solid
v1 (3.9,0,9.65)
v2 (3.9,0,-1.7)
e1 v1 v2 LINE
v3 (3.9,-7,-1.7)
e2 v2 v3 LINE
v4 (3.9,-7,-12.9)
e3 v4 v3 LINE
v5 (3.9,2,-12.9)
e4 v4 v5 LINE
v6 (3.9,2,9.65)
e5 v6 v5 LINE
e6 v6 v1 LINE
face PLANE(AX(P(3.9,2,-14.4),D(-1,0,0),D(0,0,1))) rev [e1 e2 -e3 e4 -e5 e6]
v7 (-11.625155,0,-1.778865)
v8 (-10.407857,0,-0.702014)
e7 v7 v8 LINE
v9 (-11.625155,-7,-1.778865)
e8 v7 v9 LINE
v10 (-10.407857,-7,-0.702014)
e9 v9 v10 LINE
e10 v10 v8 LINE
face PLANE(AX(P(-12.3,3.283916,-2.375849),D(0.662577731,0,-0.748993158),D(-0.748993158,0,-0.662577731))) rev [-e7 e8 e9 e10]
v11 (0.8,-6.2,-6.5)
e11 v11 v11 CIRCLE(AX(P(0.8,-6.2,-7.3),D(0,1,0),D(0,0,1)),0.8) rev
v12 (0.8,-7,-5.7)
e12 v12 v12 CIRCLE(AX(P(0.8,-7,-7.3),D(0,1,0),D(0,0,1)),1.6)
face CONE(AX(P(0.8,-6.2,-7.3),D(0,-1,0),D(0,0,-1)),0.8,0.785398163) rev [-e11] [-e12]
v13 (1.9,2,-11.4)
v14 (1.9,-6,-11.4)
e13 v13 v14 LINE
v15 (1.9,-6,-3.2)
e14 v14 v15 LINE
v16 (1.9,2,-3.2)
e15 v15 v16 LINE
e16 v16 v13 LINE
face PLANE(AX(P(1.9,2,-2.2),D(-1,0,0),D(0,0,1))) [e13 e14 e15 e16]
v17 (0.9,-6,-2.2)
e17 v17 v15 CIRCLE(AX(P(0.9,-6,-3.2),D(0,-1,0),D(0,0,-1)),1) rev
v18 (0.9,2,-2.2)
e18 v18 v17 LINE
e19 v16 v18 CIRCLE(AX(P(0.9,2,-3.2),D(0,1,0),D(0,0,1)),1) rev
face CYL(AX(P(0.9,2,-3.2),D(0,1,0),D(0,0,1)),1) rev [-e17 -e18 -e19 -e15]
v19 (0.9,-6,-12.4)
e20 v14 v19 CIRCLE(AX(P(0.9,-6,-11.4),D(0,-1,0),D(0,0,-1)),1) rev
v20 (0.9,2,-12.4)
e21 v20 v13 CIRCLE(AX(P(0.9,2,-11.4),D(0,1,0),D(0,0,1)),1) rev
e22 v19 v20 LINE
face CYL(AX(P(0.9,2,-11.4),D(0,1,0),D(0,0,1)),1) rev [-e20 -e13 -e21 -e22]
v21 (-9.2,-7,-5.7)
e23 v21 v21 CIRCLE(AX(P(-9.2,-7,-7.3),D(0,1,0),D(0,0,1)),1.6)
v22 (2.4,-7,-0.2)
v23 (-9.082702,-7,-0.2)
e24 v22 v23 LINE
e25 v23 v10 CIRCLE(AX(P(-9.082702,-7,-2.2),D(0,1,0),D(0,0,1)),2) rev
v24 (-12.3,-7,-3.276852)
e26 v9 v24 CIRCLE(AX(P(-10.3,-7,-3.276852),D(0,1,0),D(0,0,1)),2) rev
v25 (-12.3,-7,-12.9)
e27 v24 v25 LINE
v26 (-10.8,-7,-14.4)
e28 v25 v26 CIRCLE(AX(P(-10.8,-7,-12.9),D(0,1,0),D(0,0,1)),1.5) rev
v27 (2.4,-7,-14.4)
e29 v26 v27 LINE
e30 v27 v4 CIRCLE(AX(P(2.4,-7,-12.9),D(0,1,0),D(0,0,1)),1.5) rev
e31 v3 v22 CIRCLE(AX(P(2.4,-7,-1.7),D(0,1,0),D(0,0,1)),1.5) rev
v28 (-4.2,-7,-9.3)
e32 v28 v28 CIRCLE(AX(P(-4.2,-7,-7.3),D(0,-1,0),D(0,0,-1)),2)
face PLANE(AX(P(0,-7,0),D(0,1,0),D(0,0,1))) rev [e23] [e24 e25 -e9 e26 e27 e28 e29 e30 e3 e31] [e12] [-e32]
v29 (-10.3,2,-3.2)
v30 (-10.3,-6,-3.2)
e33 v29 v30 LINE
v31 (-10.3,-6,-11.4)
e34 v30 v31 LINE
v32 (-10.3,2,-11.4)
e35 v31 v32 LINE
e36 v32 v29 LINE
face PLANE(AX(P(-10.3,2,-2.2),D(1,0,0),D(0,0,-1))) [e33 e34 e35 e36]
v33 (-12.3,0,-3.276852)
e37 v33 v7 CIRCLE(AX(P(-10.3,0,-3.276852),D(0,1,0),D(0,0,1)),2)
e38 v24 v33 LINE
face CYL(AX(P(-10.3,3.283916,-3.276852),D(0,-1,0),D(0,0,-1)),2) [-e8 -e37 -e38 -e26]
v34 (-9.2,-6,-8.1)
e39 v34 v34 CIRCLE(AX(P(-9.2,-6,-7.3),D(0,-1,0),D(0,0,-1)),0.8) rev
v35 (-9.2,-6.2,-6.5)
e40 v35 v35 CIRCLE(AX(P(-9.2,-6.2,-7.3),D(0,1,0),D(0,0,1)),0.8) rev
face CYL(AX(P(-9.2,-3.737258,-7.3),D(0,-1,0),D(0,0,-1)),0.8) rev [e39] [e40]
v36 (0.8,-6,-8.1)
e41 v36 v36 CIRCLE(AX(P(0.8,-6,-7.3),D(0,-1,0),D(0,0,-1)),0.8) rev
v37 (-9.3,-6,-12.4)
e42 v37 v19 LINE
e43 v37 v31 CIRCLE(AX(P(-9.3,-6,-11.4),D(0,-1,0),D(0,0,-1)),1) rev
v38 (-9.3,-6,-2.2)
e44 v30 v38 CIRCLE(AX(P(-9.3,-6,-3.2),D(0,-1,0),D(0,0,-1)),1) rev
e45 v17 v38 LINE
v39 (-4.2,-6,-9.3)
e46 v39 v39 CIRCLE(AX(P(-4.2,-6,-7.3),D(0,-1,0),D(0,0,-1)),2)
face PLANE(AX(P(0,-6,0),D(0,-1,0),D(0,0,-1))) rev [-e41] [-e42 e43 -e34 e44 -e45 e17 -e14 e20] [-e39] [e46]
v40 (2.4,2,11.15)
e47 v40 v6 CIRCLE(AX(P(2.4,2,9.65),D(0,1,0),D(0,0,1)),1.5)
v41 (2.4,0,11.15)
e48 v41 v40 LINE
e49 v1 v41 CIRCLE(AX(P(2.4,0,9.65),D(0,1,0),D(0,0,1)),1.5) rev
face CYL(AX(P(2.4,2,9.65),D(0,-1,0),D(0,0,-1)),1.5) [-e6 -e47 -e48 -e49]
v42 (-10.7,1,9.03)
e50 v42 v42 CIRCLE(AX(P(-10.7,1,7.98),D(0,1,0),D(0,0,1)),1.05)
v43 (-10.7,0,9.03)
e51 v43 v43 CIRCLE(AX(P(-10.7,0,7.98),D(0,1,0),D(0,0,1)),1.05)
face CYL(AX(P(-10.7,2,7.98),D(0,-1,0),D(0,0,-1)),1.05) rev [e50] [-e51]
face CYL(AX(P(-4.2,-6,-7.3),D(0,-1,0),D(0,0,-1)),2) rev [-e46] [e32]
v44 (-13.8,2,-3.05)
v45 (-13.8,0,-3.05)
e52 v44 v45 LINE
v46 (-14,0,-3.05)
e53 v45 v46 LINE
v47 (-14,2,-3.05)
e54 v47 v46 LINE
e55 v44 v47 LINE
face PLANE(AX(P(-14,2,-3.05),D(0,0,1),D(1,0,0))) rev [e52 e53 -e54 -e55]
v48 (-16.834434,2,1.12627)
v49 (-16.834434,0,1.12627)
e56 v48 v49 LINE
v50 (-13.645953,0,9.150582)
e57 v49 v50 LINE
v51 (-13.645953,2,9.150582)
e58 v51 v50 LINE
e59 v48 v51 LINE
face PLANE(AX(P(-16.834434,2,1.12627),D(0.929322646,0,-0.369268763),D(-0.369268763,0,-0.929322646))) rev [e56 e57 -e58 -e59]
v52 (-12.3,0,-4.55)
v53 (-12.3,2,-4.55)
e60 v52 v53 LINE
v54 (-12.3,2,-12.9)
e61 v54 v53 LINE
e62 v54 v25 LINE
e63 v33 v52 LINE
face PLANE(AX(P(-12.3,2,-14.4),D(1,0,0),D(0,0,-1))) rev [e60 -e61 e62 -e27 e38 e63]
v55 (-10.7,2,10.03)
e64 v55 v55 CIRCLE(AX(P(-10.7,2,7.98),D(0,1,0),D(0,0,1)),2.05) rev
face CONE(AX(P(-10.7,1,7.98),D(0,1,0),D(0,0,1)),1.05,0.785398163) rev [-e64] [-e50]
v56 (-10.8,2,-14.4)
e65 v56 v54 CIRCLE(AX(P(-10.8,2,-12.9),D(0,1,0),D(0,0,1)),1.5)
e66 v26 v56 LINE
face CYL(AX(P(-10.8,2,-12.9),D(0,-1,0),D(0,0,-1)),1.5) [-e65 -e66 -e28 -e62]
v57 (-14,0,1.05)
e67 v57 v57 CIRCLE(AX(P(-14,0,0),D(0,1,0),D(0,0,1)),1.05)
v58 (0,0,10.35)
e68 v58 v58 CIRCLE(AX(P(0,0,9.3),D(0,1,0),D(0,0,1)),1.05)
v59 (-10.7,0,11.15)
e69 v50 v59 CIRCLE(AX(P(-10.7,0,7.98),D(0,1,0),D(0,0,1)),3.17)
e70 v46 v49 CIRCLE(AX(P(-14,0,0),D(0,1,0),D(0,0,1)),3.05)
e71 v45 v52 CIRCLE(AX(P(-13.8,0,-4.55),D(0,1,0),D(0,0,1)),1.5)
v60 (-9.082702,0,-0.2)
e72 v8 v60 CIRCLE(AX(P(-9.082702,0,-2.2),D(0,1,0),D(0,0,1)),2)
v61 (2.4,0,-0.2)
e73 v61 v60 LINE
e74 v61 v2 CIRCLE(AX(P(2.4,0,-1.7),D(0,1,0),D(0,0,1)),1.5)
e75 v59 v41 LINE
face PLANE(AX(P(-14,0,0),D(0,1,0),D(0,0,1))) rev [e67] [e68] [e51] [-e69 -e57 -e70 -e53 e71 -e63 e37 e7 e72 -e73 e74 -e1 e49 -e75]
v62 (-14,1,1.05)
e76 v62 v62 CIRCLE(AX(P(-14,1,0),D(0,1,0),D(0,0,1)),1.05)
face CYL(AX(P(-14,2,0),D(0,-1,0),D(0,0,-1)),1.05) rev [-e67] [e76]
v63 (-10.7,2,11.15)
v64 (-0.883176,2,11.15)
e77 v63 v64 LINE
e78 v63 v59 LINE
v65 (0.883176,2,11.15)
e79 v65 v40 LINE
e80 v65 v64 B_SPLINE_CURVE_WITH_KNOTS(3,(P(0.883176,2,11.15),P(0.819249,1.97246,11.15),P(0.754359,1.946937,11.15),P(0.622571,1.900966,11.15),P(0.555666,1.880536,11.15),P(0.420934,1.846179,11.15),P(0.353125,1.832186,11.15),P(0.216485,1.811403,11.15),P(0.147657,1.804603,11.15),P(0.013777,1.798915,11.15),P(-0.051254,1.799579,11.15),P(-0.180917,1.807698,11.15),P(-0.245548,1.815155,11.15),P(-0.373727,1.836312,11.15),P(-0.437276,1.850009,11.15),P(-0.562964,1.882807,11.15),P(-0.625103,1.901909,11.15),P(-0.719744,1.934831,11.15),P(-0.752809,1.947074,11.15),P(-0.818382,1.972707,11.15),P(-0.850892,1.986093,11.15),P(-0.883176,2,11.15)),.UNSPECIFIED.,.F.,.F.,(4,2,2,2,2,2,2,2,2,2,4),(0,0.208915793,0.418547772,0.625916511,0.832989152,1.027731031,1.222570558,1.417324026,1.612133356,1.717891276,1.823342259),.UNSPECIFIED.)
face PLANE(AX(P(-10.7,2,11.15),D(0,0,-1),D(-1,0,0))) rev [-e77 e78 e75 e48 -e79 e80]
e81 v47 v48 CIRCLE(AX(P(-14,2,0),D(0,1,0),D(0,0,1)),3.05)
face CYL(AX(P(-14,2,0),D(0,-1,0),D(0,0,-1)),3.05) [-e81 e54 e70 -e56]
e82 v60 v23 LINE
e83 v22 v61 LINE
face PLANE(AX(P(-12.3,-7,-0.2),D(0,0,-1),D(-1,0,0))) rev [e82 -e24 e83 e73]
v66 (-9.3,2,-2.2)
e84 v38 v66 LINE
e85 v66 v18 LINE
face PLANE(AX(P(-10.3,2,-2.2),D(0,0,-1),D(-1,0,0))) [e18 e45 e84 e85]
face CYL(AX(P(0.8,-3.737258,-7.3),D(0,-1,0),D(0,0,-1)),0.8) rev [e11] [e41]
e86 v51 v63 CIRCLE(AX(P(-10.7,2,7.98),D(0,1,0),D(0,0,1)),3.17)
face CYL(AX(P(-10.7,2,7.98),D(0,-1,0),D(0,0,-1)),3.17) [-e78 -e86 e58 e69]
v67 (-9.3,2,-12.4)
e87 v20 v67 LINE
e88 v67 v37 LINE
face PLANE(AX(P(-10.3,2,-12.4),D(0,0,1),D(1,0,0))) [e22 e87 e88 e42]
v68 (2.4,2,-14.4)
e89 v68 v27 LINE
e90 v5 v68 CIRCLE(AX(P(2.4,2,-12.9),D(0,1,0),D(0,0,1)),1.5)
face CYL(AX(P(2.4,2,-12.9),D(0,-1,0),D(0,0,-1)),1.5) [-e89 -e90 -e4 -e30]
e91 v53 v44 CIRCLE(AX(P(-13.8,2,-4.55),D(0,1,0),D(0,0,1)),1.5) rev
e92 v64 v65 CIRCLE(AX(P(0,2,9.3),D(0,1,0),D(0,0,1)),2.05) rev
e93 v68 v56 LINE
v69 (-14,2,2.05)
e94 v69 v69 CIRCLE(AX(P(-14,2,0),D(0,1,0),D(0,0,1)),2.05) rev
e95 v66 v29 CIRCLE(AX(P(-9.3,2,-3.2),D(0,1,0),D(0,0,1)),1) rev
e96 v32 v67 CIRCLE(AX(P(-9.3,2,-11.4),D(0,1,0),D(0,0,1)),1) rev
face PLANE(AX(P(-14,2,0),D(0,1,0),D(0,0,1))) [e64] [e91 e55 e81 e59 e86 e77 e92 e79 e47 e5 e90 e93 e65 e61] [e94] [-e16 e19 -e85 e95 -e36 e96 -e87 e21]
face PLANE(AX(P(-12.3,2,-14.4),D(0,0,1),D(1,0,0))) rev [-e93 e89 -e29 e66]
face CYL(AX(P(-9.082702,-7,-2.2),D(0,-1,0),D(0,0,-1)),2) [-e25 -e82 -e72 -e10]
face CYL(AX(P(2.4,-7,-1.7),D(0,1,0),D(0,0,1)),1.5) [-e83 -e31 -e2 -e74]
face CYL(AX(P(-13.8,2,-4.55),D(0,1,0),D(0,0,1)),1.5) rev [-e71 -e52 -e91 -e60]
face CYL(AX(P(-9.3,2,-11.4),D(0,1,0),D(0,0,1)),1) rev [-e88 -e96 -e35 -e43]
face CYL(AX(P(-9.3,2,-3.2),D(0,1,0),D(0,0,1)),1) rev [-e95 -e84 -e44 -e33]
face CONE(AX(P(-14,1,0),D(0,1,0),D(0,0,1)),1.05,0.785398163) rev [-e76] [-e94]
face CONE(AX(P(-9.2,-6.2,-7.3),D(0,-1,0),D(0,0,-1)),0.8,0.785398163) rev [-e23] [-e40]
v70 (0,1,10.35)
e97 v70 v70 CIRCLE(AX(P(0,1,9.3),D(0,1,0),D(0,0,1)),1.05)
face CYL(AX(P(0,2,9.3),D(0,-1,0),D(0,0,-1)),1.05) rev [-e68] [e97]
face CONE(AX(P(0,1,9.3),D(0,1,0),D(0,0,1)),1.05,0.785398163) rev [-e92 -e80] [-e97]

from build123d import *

# Parameters (mm, degrees)
SKETCH1_R           = 1.05
SKETCH1_W           = 12.2
SKETCH1_H           = 10.2
BOSS_EXTRUDE1_DEPTH = 2
SKETCH2_W           = 16.2
SKETCH2_H           = 14.2
SKETCH2_W_2         = 12.2
SKETCH2_H_2         = 10.2
BOSS_EXTRUDE2_DEPTH = 7
SKETCH4_W           = 16.2
SKETCH4_H           = 14.2
SKETCH4_R           = 2
BOSS_EXTRUDE3_DEPTH = 1
FILLET1_R           = 1.5
CUT_EXTRUDE1_DEPTH  = 7
FILLET2_R           = 2
FILLET3_R           = 1
CHAMFER2_SIZE       = 1
SKETCH6_R           = 0.8
CUT_EXTRUDE2_DEPTH  = 1
CHAMFER3_SIZE       = 0.8


with BuildPart() as part:
    # Sketch1 → Boss-Extrude1 (new body)
    with BuildSketch(Plane(origin=(0, 0, 0), x_dir=(1, 0, 0), z_dir=(0, 1, 0))):
        with BuildLine():
            Line((-16.83443407, -1.126269728), (-13.645952788, -9.15058198))
            ThreePointArc((-13.645952788, -9.15058198), (-12.480190316, -10.602941562), (-10.7, -11.15))
            Line((-10.7, -11.15), (3.9, -11.15))
            Line((3.9, -11.15), (3.9, 0.2))
            Line((3.9, 0.2), (3.9, 14.4))
            Line((3.9, 14.4), (-12.3, 14.4))
            Line((-12.3, 14.4), (-12.3, 3.05))
            Line((-12.3, 3.05), (-14, 3.05))
            ThreePointArc((-14, 3.05), (-16.523650399, 1.712801408), (-16.83443407, -1.126269728))
        make_face()
        with Locations(Location((-14, 0, 0), (0, 0, 270))):
            Circle(SKETCH1_R, mode=Mode.SUBTRACT)
        with Locations(Location((0, -9.3, 0), (0, 0, 270))):
            Circle(SKETCH1_R, mode=Mode.SUBTRACT)
        with Locations(Location((-10.7, -7.98, 0), (0, 0, 270))):
            Circle(SKETCH1_R, mode=Mode.SUBTRACT)
        with Locations((-4.2, 7.3)):
            Rectangle(SKETCH1_W, SKETCH1_H, mode=Mode.SUBTRACT)
    extrude(amount=BOSS_EXTRUDE1_DEPTH)

    # Sketch2 → Boss-Extrude2 (add)
    with BuildSketch(Plane.XZ):
        with Locations((-4.2, -7.3)):
            Rectangle(SKETCH2_W, SKETCH2_H)
        with Locations((-4.2, -7.3)):
            Rectangle(SKETCH2_W_2, SKETCH2_H_2, mode=Mode.SUBTRACT)
    extrude(amount=BOSS_EXTRUDE2_DEPTH)

    # Sketch4 → Boss-Extrude3 (add)
    with BuildSketch(Plane.XZ.offset(7)):
        with Locations((-4.2, -7.3)):
            Rectangle(SKETCH4_W, SKETCH4_H)
        with Locations(Location((-4.2, -7.3, 0), (0, 0, 270))):
            Circle(SKETCH4_R, mode=Mode.SUBTRACT)
    extrude(amount=-BOSS_EXTRUDE3_DEPTH)

    # Fillet1
    fillet1_edges = [part.edges().sort_by_distance(p)[0] for p in [
        (-12.3, -2.5, -14.4),
        (3.9, -2.5, -14.4),
        (3.9, 1, 11.15),
        (-12.3, 1, -3.05),
        (3.9, -3.5, -0.2),
        (-12.3, -3.5, -0.2),
    ]]
    fillet(fillet1_edges, radius=FILLET1_R)

    # Sketch5 → Cut-Extrude1 (cut)
    with BuildSketch(Plane.XZ.offset(7)):
        Polygon((-12.3, -2.375849406), (-12.3, -0.2), (-9.840369616, -0.2), align=None)
    extrude(amount=-CUT_EXTRUDE1_DEPTH, mode=Mode.SUBTRACT)

    # Fillet2
    fillet2_edges = [part.edges().sort_by_distance(p)[0] for p in [
        (-12.3, -3.5, -2.375849406),
        (-9.840369616, -3.5, -0.2),
    ]]
    fillet(fillet2_edges, radius=FILLET2_R)

    # Fillet3
    fillet3_edges = [part.edges().sort_by_distance(p)[0] for p in [
        (1.9, -2, -2.2),
        (1.9, -2, -12.4),
        (-10.3, -2, -12.4),
        (-10.3, -2, -2.2),
    ]]
    fillet(fillet3_edges, radius=FILLET3_R)

    # Chamfer2
    # the kernel refuses this chamfer: 1 mm, written as the material it takes off along each edge
    with BuildSketch(Plane(origin=(-14, 2, 0), x_dir=(0, 0, 1), z_dir=(-1, 0, 0))) as chamfer2_piece_1:
        Polygon((1.05 + CHAMFER2_SIZE, 0), (1.05, -CHAMFER2_SIZE), (1.05, 0), align=None)
    revolve(axis=Axis((-14, 2, 0), (0, 1, 0)), mode=Mode.SUBTRACT)
    with BuildSketch(Plane(origin=(0, 2, 9.3), x_dir=(0, 0, 1), z_dir=(-1, 0, 0))) as chamfer2_piece_2:
        Polygon((1.05 + CHAMFER2_SIZE, 0), (1.05, -CHAMFER2_SIZE), (1.05, 0), align=None)
    revolve(axis=Axis((0, 2, 9.3), (0, 1, 0)), mode=Mode.SUBTRACT)
    with BuildSketch(Plane(origin=(-10.7, 2, 7.98), x_dir=(0, 0, 1), z_dir=(-1, 0, 0))) as chamfer2_piece_3:
        Polygon((1.05 + CHAMFER2_SIZE, 0), (1.05, -CHAMFER2_SIZE), (1.05, 0), align=None)
    revolve(axis=Axis((-10.7, 2, 7.98), (0, 1, 0)), mode=Mode.SUBTRACT)

    # Sketch6 → Cut-Extrude2 (cut)
    with BuildSketch(Plane.XZ.offset(7)):
        with Locations(Location((-9.2, -7.3, 0), (0, 0, 270))):
            Circle(SKETCH6_R)
        with Locations(Location((0.8, -7.3, 0), (0, 0, 270))):
            Circle(SKETCH6_R)
    extrude(amount=-CUT_EXTRUDE2_DEPTH, mode=Mode.SUBTRACT)

    # Chamfer3
    chamfer3_edges = [part.edges().sort_by_distance(p)[0] for p in [
        (-9.2, -7, -6.5),
        (0.8, -7, -6.5),
    ]]
    chamfer(chamfer3_edges, length=CHAMFER3_SIZE)


solid = part.part
